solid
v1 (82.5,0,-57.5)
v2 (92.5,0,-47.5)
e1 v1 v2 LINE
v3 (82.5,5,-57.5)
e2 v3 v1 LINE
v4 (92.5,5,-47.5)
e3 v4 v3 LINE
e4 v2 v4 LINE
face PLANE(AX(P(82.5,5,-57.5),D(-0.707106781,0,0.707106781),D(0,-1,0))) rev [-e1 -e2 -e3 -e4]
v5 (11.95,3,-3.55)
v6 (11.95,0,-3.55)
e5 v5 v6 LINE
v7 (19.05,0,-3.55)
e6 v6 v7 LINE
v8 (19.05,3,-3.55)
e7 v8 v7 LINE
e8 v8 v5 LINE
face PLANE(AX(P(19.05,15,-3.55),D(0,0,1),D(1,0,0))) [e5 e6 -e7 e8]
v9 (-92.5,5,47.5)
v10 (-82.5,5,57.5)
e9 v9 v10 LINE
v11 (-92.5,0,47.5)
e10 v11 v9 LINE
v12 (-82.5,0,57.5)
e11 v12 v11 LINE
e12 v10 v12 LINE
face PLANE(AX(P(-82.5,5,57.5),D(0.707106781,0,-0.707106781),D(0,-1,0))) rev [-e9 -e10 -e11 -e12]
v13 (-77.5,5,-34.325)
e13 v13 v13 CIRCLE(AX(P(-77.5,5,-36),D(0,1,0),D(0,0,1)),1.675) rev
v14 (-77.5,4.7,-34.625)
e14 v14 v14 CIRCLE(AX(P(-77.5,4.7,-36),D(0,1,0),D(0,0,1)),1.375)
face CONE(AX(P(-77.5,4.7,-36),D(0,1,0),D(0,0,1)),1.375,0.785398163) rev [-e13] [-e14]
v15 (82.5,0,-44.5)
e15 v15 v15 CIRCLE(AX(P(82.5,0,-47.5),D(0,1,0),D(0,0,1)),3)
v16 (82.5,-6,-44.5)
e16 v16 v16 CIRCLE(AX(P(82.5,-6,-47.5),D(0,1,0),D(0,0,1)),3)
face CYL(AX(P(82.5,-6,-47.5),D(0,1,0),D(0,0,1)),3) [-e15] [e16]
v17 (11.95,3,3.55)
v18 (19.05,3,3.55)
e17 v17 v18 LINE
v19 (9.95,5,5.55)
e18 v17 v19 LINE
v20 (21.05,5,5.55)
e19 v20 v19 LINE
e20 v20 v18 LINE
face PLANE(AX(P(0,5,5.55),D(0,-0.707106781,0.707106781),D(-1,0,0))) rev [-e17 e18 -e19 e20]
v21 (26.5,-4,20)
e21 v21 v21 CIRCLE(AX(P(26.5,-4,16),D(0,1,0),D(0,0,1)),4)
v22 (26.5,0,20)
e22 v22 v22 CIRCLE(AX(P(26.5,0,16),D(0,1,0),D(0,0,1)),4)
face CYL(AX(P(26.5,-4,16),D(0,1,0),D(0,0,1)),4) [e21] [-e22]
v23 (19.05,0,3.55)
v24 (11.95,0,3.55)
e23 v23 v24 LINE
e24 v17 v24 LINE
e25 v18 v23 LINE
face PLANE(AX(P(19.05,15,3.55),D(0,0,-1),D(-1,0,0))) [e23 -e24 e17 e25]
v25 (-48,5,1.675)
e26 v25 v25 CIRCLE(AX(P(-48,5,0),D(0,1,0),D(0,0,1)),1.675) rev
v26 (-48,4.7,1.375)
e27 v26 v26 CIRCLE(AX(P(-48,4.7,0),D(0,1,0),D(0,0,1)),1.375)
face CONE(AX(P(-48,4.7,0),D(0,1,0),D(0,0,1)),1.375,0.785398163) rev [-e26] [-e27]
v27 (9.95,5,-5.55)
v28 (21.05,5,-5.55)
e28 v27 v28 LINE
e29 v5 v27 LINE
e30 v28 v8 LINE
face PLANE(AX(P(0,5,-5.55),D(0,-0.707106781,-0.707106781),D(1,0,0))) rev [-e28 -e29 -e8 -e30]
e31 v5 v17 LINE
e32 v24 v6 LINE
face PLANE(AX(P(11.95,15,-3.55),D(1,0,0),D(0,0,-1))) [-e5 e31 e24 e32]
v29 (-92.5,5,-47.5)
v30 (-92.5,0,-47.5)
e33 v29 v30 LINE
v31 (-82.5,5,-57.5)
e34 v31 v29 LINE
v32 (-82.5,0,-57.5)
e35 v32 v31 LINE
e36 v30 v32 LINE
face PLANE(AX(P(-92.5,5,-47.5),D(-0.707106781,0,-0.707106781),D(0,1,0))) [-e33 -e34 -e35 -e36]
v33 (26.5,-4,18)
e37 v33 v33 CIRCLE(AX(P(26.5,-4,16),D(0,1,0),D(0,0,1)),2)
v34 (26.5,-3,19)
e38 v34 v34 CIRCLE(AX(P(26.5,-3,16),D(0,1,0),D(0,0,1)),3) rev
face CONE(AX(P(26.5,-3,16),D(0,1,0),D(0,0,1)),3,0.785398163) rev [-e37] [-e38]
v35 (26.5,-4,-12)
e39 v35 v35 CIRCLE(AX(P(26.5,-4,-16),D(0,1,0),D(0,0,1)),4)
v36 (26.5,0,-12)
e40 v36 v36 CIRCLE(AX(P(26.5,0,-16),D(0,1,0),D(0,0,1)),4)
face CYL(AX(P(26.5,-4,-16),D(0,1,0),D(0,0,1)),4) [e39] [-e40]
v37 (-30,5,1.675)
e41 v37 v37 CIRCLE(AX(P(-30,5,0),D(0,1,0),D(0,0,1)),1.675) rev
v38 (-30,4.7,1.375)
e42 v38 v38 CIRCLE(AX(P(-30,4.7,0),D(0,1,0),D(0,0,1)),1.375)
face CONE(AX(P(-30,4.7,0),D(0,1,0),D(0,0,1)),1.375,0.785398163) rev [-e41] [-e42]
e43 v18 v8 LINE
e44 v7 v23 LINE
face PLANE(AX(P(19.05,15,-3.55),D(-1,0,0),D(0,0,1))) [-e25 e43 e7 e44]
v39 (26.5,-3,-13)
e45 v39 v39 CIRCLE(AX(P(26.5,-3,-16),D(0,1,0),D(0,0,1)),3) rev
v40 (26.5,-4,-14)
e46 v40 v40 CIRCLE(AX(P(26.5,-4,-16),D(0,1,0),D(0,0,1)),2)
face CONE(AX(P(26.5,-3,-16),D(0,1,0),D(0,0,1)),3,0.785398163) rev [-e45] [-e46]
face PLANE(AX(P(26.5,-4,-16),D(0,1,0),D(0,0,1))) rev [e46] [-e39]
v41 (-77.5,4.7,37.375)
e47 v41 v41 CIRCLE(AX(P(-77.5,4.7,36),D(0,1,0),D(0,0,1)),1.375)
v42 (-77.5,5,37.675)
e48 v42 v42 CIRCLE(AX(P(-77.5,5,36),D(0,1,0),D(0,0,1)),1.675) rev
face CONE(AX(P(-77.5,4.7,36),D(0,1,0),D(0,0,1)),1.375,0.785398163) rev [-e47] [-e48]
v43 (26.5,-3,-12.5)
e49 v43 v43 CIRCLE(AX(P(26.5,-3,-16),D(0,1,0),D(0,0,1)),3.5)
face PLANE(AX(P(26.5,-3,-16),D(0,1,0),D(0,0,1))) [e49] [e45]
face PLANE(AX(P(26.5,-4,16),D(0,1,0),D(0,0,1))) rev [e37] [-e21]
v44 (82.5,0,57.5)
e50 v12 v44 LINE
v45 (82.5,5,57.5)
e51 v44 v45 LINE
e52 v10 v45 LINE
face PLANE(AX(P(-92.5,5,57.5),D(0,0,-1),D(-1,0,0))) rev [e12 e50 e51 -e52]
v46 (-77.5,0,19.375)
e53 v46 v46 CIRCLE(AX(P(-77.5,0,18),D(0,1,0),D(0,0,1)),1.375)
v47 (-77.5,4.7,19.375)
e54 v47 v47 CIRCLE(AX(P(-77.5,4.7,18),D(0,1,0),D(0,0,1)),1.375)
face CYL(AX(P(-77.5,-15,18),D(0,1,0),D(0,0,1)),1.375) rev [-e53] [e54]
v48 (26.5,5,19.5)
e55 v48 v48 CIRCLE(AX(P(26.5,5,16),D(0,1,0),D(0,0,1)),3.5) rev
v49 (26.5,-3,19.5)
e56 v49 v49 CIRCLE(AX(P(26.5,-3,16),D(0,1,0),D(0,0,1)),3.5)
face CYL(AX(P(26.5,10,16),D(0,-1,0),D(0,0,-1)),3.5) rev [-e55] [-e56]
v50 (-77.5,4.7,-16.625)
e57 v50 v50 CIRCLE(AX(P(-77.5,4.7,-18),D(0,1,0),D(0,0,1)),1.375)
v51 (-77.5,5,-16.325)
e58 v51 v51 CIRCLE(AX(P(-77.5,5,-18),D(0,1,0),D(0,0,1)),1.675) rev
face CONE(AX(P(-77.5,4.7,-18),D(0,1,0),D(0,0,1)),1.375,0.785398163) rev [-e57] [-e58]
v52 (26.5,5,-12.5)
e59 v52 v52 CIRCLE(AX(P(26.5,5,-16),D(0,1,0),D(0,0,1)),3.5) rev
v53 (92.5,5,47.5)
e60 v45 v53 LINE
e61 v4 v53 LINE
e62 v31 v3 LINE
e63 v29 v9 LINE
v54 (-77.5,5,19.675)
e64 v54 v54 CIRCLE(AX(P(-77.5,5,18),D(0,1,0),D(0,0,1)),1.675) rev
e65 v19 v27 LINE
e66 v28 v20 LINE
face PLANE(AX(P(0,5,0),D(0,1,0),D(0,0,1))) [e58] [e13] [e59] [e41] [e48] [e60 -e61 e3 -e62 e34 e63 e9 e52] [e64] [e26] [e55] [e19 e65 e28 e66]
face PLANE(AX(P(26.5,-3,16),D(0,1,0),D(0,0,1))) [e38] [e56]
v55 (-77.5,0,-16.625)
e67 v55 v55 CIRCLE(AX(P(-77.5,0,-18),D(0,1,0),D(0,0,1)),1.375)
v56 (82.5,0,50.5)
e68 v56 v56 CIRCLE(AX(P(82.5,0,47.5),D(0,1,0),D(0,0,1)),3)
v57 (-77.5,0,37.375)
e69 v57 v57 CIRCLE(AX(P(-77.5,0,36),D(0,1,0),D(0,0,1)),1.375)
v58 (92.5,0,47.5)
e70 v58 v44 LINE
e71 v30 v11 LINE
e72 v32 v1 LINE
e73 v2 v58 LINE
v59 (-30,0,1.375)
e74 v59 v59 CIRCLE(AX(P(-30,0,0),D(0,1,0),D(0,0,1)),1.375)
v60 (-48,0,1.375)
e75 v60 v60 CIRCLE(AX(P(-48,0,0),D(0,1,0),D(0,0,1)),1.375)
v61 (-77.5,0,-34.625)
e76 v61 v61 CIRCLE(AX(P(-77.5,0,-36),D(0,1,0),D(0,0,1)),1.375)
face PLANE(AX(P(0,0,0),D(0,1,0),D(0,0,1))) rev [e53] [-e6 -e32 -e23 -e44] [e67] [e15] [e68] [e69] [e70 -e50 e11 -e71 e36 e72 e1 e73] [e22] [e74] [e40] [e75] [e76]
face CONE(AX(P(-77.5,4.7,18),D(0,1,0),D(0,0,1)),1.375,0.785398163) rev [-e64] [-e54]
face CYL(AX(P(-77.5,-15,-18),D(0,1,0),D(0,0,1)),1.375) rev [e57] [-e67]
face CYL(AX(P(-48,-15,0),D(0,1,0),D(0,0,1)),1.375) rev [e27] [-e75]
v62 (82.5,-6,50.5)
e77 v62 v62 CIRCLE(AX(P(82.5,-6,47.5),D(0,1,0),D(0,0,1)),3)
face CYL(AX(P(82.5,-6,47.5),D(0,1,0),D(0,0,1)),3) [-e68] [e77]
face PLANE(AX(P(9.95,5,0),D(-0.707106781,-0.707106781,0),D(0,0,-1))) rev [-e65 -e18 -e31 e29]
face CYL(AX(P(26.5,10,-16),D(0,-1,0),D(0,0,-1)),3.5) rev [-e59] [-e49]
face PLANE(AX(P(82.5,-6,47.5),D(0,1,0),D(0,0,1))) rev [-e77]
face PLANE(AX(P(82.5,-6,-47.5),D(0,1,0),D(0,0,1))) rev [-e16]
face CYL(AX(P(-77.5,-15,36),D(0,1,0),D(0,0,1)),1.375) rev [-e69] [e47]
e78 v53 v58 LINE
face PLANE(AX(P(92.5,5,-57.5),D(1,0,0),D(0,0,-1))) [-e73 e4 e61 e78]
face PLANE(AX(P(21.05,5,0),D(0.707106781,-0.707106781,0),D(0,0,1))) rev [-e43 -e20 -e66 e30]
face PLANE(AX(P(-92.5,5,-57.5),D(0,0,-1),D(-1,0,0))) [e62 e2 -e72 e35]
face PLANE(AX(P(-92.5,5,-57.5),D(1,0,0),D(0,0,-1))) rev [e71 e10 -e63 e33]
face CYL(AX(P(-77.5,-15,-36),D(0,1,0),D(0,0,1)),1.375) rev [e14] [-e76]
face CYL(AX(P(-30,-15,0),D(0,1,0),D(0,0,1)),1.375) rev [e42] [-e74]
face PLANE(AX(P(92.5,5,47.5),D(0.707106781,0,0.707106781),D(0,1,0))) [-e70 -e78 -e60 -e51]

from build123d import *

# Parameters (mm, degrees)
SKETCH1_W               = 185
SKETCH1_H               = 115
BOSS_EXTRUDE2_DEPTH     = 5
CUT_EXTRUDE5_DEPTH      = 15
CUT_EXTRUDE5_DEPTH_BACK = 15
SKETCH1_7_OUTSIDE_W     = 230.578
SKETCH1_7_OUTSIDE_H     = 160.578
SKETCH1_7_OUTSIDE_W_2   = 185
SKETCH1_7_OUTSIDE_H_2   = 115
SKETCH1_7_OUTSIDE_R     = 1.375
CHAMFER2_SIZE           = 0.3
SKETCH10_R              = 3
BOSS_EXTRUDE3_DEPTH     = 6
SKETCH11_R              = 4
BOSS_EXTRUDE4_DEPTH     = 4
CUT_EXTRUDE6_DEPTH      = 10
CUT_EXTRUDE6_DEPTH_BACK = 3
SKETCH13_R              = 3.5
CUT_EXTRUDE8_DEPTH      = 7
CUT_EXTRUDE8_DEPTH_BACK = 7
SKETCH14_R              = 1.375
CHAMFER3_SIZE           = 1.625
CHAMFER6_SIZE           = 10
CUT_EXTRUDE9_DEPTH      = 10
CUT_EXTRUDE9_DEPTH_BACK = 10
SKETCH15_W              = 7.1
SKETCH15_H              = 7.1
CHAMFER7_SIZE           = 2


with BuildPart() as part:
    # Sketch1 → Boss-Extrude2 (new body)
    with BuildSketch(Plane(origin=(0, 0, 0), x_dir=(1, 0, 0), z_dir=(0, 1, 0))):
        Rectangle(SKETCH1_W, SKETCH1_H)
    extrude(amount=BOSS_EXTRUDE2_DEPTH)

    # Sketch1<7> outside → Cut-Extrude5 (cut, two sides: drawn at the far end of the back side and taken through both)
    # profile 1 of 9: a face of its own
    with BuildSketch(Plane(origin=(0, 0, 0), x_dir=(1, 0, 0), z_dir=(0, 1, 0)).offset(-CUT_EXTRUDE5_DEPTH_BACK)):
        Rectangle(SKETCH1_7_OUTSIDE_W, SKETCH1_7_OUTSIDE_H)
        Rectangle(SKETCH1_7_OUTSIDE_W_2, SKETCH1_7_OUTSIDE_H_2, mode=Mode.SUBTRACT)
    # profile 2 of 9: a face of its own
    with BuildSketch(Plane(origin=(0, 0, 0), x_dir=(1, 0, 0), z_dir=(0, 1, 0)).offset(-CUT_EXTRUDE5_DEPTH_BACK)):
        with Locations(Location((26.5, 16, 0), (0, 0, 270))):
            Circle(SKETCH1_7_OUTSIDE_R)
    # profile 3 of 9: a face of its own
    with BuildSketch(Plane(origin=(0, 0, 0), x_dir=(1, 0, 0), z_dir=(0, 1, 0)).offset(-CUT_EXTRUDE5_DEPTH_BACK)):
        with Locations(Location((26.5, -16, 0), (0, 0, 270))):
            Circle(SKETCH1_7_OUTSIDE_R)
    # profile 4 of 9: a face of its own
    with BuildSketch(Plane(origin=(0, 0, 0), x_dir=(1, 0, 0), z_dir=(0, 1, 0)).offset(-CUT_EXTRUDE5_DEPTH_BACK)):
        with Locations(Location((-77.5, 36, 0), (0, 0, 270))):
            Circle(SKETCH1_7_OUTSIDE_R)
    # profile 5 of 9: a face of its own
    with BuildSketch(Plane(origin=(0, 0, 0), x_dir=(1, 0, 0), z_dir=(0, 1, 0)).offset(-CUT_EXTRUDE5_DEPTH_BACK)):
        with Locations(Location((-77.5, 18, 0), (0, 0, 270))):
            Circle(SKETCH1_7_OUTSIDE_R)
    # profile 6 of 9: a face of its own
    with BuildSketch(Plane(origin=(0, 0, 0), x_dir=(1, 0, 0), z_dir=(0, 1, 0)).offset(-CUT_EXTRUDE5_DEPTH_BACK)):
        with Locations(Location((-77.5, -18, 0), (0, 0, 270))):
            Circle(SKETCH1_7_OUTSIDE_R)
    # profile 7 of 9: a face of its own
    with BuildSketch(Plane(origin=(0, 0, 0), x_dir=(1, 0, 0), z_dir=(0, 1, 0)).offset(-CUT_EXTRUDE5_DEPTH_BACK)):
        with Locations(Location((-77.5, -36, 0), (0, 0, 270))):
            Circle(SKETCH1_7_OUTSIDE_R)
    # profile 8 of 9: a face of its own
    with BuildSketch(Plane(origin=(0, 0, 0), x_dir=(1, 0, 0), z_dir=(0, 1, 0)).offset(-CUT_EXTRUDE5_DEPTH_BACK)):
        with Locations(Location((-48, 0, 0), (0, 0, 270))):
            Circle(SKETCH1_7_OUTSIDE_R)
    # profile 9 of 9: a face of its own
    with BuildSketch(Plane(origin=(0, 0, 0), x_dir=(1, 0, 0), z_dir=(0, 1, 0)).offset(-CUT_EXTRUDE5_DEPTH_BACK)):
        with Locations(Location((-30, 0, 0), (0, 0, 270))):
            Circle(SKETCH1_7_OUTSIDE_R)
    extrude(amount=CUT_EXTRUDE5_DEPTH + CUT_EXTRUDE5_DEPTH_BACK, mode=Mode.SUBTRACT)

    # Chamfer2
    chamfer2_edges = [part.edges().sort_by_distance(p)[0] for p in [
        (26.5, 5, -17.375),
        (26.5, 5, 14.625),
        (-77.5, 5, -37.375),
        (-77.5, 5, -19.375),
        (-77.5, 5, 16.625),
        (-77.5, 5, 34.625),
        (-48, 5, -1.375),
        (-30, 5, -1.375),
    ]]
    chamfer(chamfer2_edges, length=CHAMFER2_SIZE)

    # Sketch10 → Boss-Extrude3 (add)
    with BuildSketch(Plane(origin=(0, 0, 0), x_dir=(1, 0, 0), z_dir=(0, 1, 0))):
        with Locations(Location((82.5, -47.5, 0), (0, 0, 270))):
            Circle(SKETCH10_R)
        with Locations(Location((82.5, 47.5, 0), (0, 0, 270))):
            Circle(SKETCH10_R)
    extrude(amount=-BOSS_EXTRUDE3_DEPTH)

    # Sketch11 → Boss-Extrude4 (add)
    with BuildSketch(Plane(origin=(0, 0, 0), x_dir=(1, 0, 0), z_dir=(0, 1, 0))):
        with Locations(Location((26.5, -16, 0), (0, 0, 270))):
            Circle(SKETCH11_R)
        with Locations(Location((26.5, 16, 0), (0, 0, 270))):
            Circle(SKETCH11_R)
    extrude(amount=-BOSS_EXTRUDE4_DEPTH)

    # Sketch13 → Cut-Extrude6 (cut, two sides: drawn at the far end of the back side and taken through both)
    with BuildSketch(Plane(origin=(0, 0, 0), x_dir=(1, 0, 0), z_dir=(0, 1, 0)).offset(-CUT_EXTRUDE6_DEPTH_BACK)):
        with Locations(Location((26.5, 16, 0), (0, 0, 270))):
            Circle(SKETCH13_R)
        with Locations(Location((26.5, -16, 0), (0, 0, 270))):
            Circle(SKETCH13_R)
    extrude(amount=CUT_EXTRUDE6_DEPTH + CUT_EXTRUDE6_DEPTH_BACK, mode=Mode.SUBTRACT)

    # Sketch14 → Cut-Extrude8 (cut, two sides: drawn at the far end of the back side and taken through both)
    with BuildSketch(Plane(origin=(0, 0, 0), x_dir=(1, 0, 0), z_dir=(0, 1, 0)).offset(-CUT_EXTRUDE8_DEPTH_BACK)):
        with Locations(Location((26.5, 16, 0), (0, 0, 270))):
            Circle(SKETCH14_R)
        with Locations(Location((26.5, -16, 0), (0, 0, 270))):
            Circle(SKETCH14_R)
    extrude(amount=CUT_EXTRUDE8_DEPTH + CUT_EXTRUDE8_DEPTH_BACK, mode=Mode.SUBTRACT)

    # Chamfer3
    # the kernel refuses this chamfer: 1.625 mm, written as the material it takes off along each edge
    with BuildSketch(Plane(origin=(26.5, -3, 16), x_dir=(0, 0, 1), z_dir=(-1, 0, 0))) as chamfer3_piece_1:
        Polygon((1.375 + CHAMFER3_SIZE, 0), (1.375, -CHAMFER3_SIZE), (1.375, 0), align=None)
    revolve(axis=Axis((26.5, -3, 16), (0, 1, 0)), mode=Mode.SUBTRACT)
    with BuildSketch(Plane(origin=(26.5, -3, -16), x_dir=(0, 0, 1), z_dir=(-1, 0, 0))) as chamfer3_piece_2:
        Polygon((1.375 + CHAMFER3_SIZE, 0), (1.375, -CHAMFER3_SIZE), (1.375, 0), align=None)
    revolve(axis=Axis((26.5, -3, -16), (0, 1, 0)), mode=Mode.SUBTRACT)

    # Chamfer6
    chamfer6_edges = [part.edges().sort_by_distance(p)[0] for p in [
        (-92.5, 2.5, -57.5),
        (92.5, 2.5, -57.5),
        (92.5, 2.5, 57.5),
        (-92.5, 2.5, 57.5),
    ]]
    chamfer(chamfer6_edges, length=CHAMFER6_SIZE)

    # Sketch15 → Cut-Extrude9 (cut, two sides: drawn at the far end of the back side and taken through both)
    with BuildSketch(Plane(origin=(0, 5, 0), x_dir=(1, 0, 0), z_dir=(0, 1, 0)).offset(-CUT_EXTRUDE9_DEPTH_BACK)):
        with Locations((15.5, 0)):
            Rectangle(SKETCH15_W, SKETCH15_H)
    extrude(amount=CUT_EXTRUDE9_DEPTH + CUT_EXTRUDE9_DEPTH_BACK, mode=Mode.SUBTRACT)

    # Chamfer7
    chamfer7_edges = [part.edges().sort_by_distance(p)[0] for p in [
        (19.05, 5, 0),
        (15.5, 5, -3.55),
        (11.95, 5, 0),
        (15.5, 5, 3.55),
    ]]
    chamfer(chamfer7_edges, length=CHAMFER7_SIZE)


solid = part.part
